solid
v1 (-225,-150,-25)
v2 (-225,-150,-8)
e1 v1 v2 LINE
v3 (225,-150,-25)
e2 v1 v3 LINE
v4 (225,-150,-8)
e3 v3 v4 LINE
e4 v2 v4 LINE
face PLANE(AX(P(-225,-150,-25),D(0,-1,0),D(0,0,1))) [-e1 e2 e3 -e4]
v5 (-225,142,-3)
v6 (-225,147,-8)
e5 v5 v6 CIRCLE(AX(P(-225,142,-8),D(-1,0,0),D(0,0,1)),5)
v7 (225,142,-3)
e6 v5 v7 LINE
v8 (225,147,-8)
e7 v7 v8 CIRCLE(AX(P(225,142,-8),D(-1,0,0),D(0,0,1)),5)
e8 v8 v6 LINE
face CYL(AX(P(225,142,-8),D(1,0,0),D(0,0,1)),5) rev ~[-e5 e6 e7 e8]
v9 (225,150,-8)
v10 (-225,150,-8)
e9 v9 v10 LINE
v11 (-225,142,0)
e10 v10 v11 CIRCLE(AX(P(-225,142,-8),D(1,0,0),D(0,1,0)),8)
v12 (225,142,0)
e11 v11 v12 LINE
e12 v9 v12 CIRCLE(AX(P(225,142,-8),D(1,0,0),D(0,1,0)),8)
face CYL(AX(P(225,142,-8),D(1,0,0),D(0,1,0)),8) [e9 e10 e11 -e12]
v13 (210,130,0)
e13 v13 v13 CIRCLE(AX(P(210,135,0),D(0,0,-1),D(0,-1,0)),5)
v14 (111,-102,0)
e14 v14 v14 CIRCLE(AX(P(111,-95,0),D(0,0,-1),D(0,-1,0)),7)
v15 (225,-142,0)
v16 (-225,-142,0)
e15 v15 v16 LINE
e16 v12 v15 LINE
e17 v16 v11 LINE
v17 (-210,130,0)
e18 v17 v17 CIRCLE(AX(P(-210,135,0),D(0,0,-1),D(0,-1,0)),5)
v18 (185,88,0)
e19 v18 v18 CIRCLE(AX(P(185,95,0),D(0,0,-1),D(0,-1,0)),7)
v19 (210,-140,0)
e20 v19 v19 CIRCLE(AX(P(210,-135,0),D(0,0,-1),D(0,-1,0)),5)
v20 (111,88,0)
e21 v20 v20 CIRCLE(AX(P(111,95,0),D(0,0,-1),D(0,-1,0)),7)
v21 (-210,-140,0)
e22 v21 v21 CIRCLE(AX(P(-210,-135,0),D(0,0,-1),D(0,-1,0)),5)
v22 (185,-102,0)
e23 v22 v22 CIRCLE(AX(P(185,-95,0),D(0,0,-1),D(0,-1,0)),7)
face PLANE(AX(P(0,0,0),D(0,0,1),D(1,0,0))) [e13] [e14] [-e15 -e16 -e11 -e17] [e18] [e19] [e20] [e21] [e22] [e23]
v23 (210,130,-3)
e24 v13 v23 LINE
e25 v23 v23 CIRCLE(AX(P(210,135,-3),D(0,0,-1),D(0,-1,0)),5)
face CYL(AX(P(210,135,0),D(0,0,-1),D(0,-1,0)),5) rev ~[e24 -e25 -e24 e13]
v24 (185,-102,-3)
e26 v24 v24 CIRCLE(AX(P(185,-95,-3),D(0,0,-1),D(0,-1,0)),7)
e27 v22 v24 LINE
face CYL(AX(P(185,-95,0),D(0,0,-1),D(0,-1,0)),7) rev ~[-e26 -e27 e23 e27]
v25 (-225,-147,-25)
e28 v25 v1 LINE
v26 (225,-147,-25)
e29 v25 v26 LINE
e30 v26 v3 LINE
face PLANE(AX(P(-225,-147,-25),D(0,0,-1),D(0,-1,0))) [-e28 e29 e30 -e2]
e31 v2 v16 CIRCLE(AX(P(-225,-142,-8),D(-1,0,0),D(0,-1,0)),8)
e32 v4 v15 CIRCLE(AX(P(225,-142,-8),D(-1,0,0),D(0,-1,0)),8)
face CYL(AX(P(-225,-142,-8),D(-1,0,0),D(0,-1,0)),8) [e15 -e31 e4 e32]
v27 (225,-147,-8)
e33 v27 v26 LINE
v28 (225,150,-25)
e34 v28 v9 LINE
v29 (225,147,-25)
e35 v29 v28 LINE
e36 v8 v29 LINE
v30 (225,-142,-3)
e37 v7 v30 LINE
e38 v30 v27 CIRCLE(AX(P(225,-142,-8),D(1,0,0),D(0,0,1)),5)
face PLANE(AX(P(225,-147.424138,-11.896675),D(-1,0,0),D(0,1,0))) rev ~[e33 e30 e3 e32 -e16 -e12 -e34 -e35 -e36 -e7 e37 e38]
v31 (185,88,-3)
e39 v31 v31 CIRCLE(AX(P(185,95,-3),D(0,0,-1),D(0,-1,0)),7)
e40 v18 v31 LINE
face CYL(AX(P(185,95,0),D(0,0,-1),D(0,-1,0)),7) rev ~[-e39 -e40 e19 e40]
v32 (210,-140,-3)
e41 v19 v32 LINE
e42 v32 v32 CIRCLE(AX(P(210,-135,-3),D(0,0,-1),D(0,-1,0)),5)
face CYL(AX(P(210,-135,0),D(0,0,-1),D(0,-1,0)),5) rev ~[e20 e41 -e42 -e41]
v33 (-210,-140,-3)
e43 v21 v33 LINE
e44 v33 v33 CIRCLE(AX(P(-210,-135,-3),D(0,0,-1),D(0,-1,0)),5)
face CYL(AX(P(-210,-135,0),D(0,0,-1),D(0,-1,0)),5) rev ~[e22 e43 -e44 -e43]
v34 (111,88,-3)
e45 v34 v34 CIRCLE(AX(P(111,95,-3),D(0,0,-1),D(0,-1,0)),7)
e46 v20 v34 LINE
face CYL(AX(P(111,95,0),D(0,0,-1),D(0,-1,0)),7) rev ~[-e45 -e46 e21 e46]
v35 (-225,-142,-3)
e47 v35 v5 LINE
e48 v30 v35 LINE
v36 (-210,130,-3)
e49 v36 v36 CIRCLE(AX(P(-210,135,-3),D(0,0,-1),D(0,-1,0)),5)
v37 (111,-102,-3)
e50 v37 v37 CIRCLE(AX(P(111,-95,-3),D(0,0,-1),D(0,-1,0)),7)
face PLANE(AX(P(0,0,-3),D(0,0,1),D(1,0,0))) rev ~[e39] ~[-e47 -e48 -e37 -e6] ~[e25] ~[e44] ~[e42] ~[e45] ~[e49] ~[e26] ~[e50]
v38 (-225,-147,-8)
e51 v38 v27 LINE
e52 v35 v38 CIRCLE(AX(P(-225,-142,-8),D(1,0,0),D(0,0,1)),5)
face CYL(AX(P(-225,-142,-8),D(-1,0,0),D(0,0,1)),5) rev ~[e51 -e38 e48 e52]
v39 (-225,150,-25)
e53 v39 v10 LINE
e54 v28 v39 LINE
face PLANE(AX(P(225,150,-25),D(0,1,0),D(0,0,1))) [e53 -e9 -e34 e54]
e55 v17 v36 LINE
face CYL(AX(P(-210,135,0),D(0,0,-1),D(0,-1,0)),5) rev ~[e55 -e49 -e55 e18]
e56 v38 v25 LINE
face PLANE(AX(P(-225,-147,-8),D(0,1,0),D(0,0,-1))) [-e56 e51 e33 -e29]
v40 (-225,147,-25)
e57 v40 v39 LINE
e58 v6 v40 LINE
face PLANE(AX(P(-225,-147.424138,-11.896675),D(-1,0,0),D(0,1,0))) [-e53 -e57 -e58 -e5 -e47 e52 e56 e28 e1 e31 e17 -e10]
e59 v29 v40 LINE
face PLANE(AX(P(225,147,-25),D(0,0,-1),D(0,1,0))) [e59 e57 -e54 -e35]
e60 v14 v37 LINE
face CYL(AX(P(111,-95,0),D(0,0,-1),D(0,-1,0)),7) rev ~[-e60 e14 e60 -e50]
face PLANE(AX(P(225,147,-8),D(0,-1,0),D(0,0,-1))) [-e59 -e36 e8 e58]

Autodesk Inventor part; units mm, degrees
ref_plane "YZ Plane" through (0, 0, 0) normal (1, 0, 0) x (0, 1, 0)
ref_plane "XZ Plane" through (0, 0, 0) normal (0, 1, 0) x (-1, 0, 0)
ref_plane "XY Plane" through (0, 0, 0) normal (0, 0, 1) x (1, 0, 0)
sketch "Sketch1" plane through (0, 0, 0) normal (0, 0, 1) x (1, 0, 0)
  line L0 (-225, 150) -> (225, 150)
  line L1 (225, 150) -> (225, -150)
  line L2 (225, -150) -> (-225, -150)
  line L3 (-225, -150) -> (-225, 150)
  line L4 (-225, 150) -> (225, -150) construction
  point P0 (0, 0)
  point P1 (0, 0)
  dimension "d0" = 450
  dimension "d1" = 300
extrude "Plate1" add sketch "Sketch1" against normal blind 3
sketch "Sketch2" plane through (0, 0, 0) normal (0, 0, 1) x (1, 0, 0)
  line L0 (111, 95) -> (185, 95) construction
  line L1 (185, 95) -> (185, -95) construction
  line L2 (185, -95) -> (111, -95) construction
  line L3 (111, -95) -> (111, 95) construction
  line L4 (225, -150) -> (225, 150) projected
  point P0 (0, 0)
  point P1 (111, 0)
  dimension "d3" = 74
  dimension "d4" = 190
  dimension "d5" = 40
hole "Hole1" at (111, 95, 0) at (185, 95, 0) at (111, -95, 0) at (185, -95, 0) direction (0, 0, -1) diameter 14 end through all
sketch "Sketch3" plane through (0, 0, 0) normal (0, 0, 1) x (1, 0, 0)
  line L0 (-210, 135) -> (210, 135) construction
  line L1 (210, 135) -> (210, -135) construction
  line L2 (210, -135) -> (-210, -135) construction
  line L3 (-210, -135) -> (-210, 135) construction
  line L4 (-210, 135) -> (210, -135) construction
  point P0 (0, 0)
  point P1 (0, 0)
  dimension "d14" = 270
  dimension "d15" = 420
hole "Hole2" at (-210, 135, 0) at (210, 135, 0) at (210, -135, 0) at (-210, -135, 0) direction (0, 0, -1) diameter 10 end through all
sketch "Sketch4" plane through (-225, -147, 0) normal (0, -1, 0) x (1, 0, 0)
  line L0 (450, 0) -> (0, 0)
  line L1 (0, 0) -> (0, -25)
  line L2 (0, -25) -> (450, -25)
  line L3 (450, -25) -> (450, 0)
edge flange "Flange1" height 25 angle 90 thickness 3 bend radius 5 thickness toward (0, -1, 0) relief round relief width 3 relief depth 1.5 corner gap 5 corner form 0 edges at (0, -150, -3) (0, 150, -3) wall of the first edge with corners at (225, -147, 0) (-225, -147, 0) (-225, -147, -25) (225, -147, -25)
bend "Bend1"
corner "Corner1"
equation "\"d11\" = Thickness"
equation "\"d2\" = Thickness"
equation "\"d23\" = BendReliefWidth"
equation "\"d24\" = BendReliefDepth"
equation "\"d25\" = MinimumRemnant"
equation "\"d26\" = TransitionRadius"
equation "\"d29\" = BendRadius"
equation "\"d30\" = CornerReliefSize"
equation "\"d31\" = GapSize"
equation "\"d32\" = JacobiRadiusSize"
equation "\"BendReliefWidth\" = Thickness"
equation "\"BendReliefDepth\" = 0.5 * Thickness"
equation "\"CornerReliefSize\" = 4 * Thickness"
equation "\"MinimumRemnant\" = 2 * Thickness"
equation "\"TransitionRadius\" = BendRadius"
equation "\"JacobiRadiusSize\" = BendRadius"
equation "\"GapSize\" = Thickness"
equation "\"Thickness\" = 3"
equation "\"BendRadius\" = 5"
properties part number "Purity pump plate" material "Stainless Steel"
